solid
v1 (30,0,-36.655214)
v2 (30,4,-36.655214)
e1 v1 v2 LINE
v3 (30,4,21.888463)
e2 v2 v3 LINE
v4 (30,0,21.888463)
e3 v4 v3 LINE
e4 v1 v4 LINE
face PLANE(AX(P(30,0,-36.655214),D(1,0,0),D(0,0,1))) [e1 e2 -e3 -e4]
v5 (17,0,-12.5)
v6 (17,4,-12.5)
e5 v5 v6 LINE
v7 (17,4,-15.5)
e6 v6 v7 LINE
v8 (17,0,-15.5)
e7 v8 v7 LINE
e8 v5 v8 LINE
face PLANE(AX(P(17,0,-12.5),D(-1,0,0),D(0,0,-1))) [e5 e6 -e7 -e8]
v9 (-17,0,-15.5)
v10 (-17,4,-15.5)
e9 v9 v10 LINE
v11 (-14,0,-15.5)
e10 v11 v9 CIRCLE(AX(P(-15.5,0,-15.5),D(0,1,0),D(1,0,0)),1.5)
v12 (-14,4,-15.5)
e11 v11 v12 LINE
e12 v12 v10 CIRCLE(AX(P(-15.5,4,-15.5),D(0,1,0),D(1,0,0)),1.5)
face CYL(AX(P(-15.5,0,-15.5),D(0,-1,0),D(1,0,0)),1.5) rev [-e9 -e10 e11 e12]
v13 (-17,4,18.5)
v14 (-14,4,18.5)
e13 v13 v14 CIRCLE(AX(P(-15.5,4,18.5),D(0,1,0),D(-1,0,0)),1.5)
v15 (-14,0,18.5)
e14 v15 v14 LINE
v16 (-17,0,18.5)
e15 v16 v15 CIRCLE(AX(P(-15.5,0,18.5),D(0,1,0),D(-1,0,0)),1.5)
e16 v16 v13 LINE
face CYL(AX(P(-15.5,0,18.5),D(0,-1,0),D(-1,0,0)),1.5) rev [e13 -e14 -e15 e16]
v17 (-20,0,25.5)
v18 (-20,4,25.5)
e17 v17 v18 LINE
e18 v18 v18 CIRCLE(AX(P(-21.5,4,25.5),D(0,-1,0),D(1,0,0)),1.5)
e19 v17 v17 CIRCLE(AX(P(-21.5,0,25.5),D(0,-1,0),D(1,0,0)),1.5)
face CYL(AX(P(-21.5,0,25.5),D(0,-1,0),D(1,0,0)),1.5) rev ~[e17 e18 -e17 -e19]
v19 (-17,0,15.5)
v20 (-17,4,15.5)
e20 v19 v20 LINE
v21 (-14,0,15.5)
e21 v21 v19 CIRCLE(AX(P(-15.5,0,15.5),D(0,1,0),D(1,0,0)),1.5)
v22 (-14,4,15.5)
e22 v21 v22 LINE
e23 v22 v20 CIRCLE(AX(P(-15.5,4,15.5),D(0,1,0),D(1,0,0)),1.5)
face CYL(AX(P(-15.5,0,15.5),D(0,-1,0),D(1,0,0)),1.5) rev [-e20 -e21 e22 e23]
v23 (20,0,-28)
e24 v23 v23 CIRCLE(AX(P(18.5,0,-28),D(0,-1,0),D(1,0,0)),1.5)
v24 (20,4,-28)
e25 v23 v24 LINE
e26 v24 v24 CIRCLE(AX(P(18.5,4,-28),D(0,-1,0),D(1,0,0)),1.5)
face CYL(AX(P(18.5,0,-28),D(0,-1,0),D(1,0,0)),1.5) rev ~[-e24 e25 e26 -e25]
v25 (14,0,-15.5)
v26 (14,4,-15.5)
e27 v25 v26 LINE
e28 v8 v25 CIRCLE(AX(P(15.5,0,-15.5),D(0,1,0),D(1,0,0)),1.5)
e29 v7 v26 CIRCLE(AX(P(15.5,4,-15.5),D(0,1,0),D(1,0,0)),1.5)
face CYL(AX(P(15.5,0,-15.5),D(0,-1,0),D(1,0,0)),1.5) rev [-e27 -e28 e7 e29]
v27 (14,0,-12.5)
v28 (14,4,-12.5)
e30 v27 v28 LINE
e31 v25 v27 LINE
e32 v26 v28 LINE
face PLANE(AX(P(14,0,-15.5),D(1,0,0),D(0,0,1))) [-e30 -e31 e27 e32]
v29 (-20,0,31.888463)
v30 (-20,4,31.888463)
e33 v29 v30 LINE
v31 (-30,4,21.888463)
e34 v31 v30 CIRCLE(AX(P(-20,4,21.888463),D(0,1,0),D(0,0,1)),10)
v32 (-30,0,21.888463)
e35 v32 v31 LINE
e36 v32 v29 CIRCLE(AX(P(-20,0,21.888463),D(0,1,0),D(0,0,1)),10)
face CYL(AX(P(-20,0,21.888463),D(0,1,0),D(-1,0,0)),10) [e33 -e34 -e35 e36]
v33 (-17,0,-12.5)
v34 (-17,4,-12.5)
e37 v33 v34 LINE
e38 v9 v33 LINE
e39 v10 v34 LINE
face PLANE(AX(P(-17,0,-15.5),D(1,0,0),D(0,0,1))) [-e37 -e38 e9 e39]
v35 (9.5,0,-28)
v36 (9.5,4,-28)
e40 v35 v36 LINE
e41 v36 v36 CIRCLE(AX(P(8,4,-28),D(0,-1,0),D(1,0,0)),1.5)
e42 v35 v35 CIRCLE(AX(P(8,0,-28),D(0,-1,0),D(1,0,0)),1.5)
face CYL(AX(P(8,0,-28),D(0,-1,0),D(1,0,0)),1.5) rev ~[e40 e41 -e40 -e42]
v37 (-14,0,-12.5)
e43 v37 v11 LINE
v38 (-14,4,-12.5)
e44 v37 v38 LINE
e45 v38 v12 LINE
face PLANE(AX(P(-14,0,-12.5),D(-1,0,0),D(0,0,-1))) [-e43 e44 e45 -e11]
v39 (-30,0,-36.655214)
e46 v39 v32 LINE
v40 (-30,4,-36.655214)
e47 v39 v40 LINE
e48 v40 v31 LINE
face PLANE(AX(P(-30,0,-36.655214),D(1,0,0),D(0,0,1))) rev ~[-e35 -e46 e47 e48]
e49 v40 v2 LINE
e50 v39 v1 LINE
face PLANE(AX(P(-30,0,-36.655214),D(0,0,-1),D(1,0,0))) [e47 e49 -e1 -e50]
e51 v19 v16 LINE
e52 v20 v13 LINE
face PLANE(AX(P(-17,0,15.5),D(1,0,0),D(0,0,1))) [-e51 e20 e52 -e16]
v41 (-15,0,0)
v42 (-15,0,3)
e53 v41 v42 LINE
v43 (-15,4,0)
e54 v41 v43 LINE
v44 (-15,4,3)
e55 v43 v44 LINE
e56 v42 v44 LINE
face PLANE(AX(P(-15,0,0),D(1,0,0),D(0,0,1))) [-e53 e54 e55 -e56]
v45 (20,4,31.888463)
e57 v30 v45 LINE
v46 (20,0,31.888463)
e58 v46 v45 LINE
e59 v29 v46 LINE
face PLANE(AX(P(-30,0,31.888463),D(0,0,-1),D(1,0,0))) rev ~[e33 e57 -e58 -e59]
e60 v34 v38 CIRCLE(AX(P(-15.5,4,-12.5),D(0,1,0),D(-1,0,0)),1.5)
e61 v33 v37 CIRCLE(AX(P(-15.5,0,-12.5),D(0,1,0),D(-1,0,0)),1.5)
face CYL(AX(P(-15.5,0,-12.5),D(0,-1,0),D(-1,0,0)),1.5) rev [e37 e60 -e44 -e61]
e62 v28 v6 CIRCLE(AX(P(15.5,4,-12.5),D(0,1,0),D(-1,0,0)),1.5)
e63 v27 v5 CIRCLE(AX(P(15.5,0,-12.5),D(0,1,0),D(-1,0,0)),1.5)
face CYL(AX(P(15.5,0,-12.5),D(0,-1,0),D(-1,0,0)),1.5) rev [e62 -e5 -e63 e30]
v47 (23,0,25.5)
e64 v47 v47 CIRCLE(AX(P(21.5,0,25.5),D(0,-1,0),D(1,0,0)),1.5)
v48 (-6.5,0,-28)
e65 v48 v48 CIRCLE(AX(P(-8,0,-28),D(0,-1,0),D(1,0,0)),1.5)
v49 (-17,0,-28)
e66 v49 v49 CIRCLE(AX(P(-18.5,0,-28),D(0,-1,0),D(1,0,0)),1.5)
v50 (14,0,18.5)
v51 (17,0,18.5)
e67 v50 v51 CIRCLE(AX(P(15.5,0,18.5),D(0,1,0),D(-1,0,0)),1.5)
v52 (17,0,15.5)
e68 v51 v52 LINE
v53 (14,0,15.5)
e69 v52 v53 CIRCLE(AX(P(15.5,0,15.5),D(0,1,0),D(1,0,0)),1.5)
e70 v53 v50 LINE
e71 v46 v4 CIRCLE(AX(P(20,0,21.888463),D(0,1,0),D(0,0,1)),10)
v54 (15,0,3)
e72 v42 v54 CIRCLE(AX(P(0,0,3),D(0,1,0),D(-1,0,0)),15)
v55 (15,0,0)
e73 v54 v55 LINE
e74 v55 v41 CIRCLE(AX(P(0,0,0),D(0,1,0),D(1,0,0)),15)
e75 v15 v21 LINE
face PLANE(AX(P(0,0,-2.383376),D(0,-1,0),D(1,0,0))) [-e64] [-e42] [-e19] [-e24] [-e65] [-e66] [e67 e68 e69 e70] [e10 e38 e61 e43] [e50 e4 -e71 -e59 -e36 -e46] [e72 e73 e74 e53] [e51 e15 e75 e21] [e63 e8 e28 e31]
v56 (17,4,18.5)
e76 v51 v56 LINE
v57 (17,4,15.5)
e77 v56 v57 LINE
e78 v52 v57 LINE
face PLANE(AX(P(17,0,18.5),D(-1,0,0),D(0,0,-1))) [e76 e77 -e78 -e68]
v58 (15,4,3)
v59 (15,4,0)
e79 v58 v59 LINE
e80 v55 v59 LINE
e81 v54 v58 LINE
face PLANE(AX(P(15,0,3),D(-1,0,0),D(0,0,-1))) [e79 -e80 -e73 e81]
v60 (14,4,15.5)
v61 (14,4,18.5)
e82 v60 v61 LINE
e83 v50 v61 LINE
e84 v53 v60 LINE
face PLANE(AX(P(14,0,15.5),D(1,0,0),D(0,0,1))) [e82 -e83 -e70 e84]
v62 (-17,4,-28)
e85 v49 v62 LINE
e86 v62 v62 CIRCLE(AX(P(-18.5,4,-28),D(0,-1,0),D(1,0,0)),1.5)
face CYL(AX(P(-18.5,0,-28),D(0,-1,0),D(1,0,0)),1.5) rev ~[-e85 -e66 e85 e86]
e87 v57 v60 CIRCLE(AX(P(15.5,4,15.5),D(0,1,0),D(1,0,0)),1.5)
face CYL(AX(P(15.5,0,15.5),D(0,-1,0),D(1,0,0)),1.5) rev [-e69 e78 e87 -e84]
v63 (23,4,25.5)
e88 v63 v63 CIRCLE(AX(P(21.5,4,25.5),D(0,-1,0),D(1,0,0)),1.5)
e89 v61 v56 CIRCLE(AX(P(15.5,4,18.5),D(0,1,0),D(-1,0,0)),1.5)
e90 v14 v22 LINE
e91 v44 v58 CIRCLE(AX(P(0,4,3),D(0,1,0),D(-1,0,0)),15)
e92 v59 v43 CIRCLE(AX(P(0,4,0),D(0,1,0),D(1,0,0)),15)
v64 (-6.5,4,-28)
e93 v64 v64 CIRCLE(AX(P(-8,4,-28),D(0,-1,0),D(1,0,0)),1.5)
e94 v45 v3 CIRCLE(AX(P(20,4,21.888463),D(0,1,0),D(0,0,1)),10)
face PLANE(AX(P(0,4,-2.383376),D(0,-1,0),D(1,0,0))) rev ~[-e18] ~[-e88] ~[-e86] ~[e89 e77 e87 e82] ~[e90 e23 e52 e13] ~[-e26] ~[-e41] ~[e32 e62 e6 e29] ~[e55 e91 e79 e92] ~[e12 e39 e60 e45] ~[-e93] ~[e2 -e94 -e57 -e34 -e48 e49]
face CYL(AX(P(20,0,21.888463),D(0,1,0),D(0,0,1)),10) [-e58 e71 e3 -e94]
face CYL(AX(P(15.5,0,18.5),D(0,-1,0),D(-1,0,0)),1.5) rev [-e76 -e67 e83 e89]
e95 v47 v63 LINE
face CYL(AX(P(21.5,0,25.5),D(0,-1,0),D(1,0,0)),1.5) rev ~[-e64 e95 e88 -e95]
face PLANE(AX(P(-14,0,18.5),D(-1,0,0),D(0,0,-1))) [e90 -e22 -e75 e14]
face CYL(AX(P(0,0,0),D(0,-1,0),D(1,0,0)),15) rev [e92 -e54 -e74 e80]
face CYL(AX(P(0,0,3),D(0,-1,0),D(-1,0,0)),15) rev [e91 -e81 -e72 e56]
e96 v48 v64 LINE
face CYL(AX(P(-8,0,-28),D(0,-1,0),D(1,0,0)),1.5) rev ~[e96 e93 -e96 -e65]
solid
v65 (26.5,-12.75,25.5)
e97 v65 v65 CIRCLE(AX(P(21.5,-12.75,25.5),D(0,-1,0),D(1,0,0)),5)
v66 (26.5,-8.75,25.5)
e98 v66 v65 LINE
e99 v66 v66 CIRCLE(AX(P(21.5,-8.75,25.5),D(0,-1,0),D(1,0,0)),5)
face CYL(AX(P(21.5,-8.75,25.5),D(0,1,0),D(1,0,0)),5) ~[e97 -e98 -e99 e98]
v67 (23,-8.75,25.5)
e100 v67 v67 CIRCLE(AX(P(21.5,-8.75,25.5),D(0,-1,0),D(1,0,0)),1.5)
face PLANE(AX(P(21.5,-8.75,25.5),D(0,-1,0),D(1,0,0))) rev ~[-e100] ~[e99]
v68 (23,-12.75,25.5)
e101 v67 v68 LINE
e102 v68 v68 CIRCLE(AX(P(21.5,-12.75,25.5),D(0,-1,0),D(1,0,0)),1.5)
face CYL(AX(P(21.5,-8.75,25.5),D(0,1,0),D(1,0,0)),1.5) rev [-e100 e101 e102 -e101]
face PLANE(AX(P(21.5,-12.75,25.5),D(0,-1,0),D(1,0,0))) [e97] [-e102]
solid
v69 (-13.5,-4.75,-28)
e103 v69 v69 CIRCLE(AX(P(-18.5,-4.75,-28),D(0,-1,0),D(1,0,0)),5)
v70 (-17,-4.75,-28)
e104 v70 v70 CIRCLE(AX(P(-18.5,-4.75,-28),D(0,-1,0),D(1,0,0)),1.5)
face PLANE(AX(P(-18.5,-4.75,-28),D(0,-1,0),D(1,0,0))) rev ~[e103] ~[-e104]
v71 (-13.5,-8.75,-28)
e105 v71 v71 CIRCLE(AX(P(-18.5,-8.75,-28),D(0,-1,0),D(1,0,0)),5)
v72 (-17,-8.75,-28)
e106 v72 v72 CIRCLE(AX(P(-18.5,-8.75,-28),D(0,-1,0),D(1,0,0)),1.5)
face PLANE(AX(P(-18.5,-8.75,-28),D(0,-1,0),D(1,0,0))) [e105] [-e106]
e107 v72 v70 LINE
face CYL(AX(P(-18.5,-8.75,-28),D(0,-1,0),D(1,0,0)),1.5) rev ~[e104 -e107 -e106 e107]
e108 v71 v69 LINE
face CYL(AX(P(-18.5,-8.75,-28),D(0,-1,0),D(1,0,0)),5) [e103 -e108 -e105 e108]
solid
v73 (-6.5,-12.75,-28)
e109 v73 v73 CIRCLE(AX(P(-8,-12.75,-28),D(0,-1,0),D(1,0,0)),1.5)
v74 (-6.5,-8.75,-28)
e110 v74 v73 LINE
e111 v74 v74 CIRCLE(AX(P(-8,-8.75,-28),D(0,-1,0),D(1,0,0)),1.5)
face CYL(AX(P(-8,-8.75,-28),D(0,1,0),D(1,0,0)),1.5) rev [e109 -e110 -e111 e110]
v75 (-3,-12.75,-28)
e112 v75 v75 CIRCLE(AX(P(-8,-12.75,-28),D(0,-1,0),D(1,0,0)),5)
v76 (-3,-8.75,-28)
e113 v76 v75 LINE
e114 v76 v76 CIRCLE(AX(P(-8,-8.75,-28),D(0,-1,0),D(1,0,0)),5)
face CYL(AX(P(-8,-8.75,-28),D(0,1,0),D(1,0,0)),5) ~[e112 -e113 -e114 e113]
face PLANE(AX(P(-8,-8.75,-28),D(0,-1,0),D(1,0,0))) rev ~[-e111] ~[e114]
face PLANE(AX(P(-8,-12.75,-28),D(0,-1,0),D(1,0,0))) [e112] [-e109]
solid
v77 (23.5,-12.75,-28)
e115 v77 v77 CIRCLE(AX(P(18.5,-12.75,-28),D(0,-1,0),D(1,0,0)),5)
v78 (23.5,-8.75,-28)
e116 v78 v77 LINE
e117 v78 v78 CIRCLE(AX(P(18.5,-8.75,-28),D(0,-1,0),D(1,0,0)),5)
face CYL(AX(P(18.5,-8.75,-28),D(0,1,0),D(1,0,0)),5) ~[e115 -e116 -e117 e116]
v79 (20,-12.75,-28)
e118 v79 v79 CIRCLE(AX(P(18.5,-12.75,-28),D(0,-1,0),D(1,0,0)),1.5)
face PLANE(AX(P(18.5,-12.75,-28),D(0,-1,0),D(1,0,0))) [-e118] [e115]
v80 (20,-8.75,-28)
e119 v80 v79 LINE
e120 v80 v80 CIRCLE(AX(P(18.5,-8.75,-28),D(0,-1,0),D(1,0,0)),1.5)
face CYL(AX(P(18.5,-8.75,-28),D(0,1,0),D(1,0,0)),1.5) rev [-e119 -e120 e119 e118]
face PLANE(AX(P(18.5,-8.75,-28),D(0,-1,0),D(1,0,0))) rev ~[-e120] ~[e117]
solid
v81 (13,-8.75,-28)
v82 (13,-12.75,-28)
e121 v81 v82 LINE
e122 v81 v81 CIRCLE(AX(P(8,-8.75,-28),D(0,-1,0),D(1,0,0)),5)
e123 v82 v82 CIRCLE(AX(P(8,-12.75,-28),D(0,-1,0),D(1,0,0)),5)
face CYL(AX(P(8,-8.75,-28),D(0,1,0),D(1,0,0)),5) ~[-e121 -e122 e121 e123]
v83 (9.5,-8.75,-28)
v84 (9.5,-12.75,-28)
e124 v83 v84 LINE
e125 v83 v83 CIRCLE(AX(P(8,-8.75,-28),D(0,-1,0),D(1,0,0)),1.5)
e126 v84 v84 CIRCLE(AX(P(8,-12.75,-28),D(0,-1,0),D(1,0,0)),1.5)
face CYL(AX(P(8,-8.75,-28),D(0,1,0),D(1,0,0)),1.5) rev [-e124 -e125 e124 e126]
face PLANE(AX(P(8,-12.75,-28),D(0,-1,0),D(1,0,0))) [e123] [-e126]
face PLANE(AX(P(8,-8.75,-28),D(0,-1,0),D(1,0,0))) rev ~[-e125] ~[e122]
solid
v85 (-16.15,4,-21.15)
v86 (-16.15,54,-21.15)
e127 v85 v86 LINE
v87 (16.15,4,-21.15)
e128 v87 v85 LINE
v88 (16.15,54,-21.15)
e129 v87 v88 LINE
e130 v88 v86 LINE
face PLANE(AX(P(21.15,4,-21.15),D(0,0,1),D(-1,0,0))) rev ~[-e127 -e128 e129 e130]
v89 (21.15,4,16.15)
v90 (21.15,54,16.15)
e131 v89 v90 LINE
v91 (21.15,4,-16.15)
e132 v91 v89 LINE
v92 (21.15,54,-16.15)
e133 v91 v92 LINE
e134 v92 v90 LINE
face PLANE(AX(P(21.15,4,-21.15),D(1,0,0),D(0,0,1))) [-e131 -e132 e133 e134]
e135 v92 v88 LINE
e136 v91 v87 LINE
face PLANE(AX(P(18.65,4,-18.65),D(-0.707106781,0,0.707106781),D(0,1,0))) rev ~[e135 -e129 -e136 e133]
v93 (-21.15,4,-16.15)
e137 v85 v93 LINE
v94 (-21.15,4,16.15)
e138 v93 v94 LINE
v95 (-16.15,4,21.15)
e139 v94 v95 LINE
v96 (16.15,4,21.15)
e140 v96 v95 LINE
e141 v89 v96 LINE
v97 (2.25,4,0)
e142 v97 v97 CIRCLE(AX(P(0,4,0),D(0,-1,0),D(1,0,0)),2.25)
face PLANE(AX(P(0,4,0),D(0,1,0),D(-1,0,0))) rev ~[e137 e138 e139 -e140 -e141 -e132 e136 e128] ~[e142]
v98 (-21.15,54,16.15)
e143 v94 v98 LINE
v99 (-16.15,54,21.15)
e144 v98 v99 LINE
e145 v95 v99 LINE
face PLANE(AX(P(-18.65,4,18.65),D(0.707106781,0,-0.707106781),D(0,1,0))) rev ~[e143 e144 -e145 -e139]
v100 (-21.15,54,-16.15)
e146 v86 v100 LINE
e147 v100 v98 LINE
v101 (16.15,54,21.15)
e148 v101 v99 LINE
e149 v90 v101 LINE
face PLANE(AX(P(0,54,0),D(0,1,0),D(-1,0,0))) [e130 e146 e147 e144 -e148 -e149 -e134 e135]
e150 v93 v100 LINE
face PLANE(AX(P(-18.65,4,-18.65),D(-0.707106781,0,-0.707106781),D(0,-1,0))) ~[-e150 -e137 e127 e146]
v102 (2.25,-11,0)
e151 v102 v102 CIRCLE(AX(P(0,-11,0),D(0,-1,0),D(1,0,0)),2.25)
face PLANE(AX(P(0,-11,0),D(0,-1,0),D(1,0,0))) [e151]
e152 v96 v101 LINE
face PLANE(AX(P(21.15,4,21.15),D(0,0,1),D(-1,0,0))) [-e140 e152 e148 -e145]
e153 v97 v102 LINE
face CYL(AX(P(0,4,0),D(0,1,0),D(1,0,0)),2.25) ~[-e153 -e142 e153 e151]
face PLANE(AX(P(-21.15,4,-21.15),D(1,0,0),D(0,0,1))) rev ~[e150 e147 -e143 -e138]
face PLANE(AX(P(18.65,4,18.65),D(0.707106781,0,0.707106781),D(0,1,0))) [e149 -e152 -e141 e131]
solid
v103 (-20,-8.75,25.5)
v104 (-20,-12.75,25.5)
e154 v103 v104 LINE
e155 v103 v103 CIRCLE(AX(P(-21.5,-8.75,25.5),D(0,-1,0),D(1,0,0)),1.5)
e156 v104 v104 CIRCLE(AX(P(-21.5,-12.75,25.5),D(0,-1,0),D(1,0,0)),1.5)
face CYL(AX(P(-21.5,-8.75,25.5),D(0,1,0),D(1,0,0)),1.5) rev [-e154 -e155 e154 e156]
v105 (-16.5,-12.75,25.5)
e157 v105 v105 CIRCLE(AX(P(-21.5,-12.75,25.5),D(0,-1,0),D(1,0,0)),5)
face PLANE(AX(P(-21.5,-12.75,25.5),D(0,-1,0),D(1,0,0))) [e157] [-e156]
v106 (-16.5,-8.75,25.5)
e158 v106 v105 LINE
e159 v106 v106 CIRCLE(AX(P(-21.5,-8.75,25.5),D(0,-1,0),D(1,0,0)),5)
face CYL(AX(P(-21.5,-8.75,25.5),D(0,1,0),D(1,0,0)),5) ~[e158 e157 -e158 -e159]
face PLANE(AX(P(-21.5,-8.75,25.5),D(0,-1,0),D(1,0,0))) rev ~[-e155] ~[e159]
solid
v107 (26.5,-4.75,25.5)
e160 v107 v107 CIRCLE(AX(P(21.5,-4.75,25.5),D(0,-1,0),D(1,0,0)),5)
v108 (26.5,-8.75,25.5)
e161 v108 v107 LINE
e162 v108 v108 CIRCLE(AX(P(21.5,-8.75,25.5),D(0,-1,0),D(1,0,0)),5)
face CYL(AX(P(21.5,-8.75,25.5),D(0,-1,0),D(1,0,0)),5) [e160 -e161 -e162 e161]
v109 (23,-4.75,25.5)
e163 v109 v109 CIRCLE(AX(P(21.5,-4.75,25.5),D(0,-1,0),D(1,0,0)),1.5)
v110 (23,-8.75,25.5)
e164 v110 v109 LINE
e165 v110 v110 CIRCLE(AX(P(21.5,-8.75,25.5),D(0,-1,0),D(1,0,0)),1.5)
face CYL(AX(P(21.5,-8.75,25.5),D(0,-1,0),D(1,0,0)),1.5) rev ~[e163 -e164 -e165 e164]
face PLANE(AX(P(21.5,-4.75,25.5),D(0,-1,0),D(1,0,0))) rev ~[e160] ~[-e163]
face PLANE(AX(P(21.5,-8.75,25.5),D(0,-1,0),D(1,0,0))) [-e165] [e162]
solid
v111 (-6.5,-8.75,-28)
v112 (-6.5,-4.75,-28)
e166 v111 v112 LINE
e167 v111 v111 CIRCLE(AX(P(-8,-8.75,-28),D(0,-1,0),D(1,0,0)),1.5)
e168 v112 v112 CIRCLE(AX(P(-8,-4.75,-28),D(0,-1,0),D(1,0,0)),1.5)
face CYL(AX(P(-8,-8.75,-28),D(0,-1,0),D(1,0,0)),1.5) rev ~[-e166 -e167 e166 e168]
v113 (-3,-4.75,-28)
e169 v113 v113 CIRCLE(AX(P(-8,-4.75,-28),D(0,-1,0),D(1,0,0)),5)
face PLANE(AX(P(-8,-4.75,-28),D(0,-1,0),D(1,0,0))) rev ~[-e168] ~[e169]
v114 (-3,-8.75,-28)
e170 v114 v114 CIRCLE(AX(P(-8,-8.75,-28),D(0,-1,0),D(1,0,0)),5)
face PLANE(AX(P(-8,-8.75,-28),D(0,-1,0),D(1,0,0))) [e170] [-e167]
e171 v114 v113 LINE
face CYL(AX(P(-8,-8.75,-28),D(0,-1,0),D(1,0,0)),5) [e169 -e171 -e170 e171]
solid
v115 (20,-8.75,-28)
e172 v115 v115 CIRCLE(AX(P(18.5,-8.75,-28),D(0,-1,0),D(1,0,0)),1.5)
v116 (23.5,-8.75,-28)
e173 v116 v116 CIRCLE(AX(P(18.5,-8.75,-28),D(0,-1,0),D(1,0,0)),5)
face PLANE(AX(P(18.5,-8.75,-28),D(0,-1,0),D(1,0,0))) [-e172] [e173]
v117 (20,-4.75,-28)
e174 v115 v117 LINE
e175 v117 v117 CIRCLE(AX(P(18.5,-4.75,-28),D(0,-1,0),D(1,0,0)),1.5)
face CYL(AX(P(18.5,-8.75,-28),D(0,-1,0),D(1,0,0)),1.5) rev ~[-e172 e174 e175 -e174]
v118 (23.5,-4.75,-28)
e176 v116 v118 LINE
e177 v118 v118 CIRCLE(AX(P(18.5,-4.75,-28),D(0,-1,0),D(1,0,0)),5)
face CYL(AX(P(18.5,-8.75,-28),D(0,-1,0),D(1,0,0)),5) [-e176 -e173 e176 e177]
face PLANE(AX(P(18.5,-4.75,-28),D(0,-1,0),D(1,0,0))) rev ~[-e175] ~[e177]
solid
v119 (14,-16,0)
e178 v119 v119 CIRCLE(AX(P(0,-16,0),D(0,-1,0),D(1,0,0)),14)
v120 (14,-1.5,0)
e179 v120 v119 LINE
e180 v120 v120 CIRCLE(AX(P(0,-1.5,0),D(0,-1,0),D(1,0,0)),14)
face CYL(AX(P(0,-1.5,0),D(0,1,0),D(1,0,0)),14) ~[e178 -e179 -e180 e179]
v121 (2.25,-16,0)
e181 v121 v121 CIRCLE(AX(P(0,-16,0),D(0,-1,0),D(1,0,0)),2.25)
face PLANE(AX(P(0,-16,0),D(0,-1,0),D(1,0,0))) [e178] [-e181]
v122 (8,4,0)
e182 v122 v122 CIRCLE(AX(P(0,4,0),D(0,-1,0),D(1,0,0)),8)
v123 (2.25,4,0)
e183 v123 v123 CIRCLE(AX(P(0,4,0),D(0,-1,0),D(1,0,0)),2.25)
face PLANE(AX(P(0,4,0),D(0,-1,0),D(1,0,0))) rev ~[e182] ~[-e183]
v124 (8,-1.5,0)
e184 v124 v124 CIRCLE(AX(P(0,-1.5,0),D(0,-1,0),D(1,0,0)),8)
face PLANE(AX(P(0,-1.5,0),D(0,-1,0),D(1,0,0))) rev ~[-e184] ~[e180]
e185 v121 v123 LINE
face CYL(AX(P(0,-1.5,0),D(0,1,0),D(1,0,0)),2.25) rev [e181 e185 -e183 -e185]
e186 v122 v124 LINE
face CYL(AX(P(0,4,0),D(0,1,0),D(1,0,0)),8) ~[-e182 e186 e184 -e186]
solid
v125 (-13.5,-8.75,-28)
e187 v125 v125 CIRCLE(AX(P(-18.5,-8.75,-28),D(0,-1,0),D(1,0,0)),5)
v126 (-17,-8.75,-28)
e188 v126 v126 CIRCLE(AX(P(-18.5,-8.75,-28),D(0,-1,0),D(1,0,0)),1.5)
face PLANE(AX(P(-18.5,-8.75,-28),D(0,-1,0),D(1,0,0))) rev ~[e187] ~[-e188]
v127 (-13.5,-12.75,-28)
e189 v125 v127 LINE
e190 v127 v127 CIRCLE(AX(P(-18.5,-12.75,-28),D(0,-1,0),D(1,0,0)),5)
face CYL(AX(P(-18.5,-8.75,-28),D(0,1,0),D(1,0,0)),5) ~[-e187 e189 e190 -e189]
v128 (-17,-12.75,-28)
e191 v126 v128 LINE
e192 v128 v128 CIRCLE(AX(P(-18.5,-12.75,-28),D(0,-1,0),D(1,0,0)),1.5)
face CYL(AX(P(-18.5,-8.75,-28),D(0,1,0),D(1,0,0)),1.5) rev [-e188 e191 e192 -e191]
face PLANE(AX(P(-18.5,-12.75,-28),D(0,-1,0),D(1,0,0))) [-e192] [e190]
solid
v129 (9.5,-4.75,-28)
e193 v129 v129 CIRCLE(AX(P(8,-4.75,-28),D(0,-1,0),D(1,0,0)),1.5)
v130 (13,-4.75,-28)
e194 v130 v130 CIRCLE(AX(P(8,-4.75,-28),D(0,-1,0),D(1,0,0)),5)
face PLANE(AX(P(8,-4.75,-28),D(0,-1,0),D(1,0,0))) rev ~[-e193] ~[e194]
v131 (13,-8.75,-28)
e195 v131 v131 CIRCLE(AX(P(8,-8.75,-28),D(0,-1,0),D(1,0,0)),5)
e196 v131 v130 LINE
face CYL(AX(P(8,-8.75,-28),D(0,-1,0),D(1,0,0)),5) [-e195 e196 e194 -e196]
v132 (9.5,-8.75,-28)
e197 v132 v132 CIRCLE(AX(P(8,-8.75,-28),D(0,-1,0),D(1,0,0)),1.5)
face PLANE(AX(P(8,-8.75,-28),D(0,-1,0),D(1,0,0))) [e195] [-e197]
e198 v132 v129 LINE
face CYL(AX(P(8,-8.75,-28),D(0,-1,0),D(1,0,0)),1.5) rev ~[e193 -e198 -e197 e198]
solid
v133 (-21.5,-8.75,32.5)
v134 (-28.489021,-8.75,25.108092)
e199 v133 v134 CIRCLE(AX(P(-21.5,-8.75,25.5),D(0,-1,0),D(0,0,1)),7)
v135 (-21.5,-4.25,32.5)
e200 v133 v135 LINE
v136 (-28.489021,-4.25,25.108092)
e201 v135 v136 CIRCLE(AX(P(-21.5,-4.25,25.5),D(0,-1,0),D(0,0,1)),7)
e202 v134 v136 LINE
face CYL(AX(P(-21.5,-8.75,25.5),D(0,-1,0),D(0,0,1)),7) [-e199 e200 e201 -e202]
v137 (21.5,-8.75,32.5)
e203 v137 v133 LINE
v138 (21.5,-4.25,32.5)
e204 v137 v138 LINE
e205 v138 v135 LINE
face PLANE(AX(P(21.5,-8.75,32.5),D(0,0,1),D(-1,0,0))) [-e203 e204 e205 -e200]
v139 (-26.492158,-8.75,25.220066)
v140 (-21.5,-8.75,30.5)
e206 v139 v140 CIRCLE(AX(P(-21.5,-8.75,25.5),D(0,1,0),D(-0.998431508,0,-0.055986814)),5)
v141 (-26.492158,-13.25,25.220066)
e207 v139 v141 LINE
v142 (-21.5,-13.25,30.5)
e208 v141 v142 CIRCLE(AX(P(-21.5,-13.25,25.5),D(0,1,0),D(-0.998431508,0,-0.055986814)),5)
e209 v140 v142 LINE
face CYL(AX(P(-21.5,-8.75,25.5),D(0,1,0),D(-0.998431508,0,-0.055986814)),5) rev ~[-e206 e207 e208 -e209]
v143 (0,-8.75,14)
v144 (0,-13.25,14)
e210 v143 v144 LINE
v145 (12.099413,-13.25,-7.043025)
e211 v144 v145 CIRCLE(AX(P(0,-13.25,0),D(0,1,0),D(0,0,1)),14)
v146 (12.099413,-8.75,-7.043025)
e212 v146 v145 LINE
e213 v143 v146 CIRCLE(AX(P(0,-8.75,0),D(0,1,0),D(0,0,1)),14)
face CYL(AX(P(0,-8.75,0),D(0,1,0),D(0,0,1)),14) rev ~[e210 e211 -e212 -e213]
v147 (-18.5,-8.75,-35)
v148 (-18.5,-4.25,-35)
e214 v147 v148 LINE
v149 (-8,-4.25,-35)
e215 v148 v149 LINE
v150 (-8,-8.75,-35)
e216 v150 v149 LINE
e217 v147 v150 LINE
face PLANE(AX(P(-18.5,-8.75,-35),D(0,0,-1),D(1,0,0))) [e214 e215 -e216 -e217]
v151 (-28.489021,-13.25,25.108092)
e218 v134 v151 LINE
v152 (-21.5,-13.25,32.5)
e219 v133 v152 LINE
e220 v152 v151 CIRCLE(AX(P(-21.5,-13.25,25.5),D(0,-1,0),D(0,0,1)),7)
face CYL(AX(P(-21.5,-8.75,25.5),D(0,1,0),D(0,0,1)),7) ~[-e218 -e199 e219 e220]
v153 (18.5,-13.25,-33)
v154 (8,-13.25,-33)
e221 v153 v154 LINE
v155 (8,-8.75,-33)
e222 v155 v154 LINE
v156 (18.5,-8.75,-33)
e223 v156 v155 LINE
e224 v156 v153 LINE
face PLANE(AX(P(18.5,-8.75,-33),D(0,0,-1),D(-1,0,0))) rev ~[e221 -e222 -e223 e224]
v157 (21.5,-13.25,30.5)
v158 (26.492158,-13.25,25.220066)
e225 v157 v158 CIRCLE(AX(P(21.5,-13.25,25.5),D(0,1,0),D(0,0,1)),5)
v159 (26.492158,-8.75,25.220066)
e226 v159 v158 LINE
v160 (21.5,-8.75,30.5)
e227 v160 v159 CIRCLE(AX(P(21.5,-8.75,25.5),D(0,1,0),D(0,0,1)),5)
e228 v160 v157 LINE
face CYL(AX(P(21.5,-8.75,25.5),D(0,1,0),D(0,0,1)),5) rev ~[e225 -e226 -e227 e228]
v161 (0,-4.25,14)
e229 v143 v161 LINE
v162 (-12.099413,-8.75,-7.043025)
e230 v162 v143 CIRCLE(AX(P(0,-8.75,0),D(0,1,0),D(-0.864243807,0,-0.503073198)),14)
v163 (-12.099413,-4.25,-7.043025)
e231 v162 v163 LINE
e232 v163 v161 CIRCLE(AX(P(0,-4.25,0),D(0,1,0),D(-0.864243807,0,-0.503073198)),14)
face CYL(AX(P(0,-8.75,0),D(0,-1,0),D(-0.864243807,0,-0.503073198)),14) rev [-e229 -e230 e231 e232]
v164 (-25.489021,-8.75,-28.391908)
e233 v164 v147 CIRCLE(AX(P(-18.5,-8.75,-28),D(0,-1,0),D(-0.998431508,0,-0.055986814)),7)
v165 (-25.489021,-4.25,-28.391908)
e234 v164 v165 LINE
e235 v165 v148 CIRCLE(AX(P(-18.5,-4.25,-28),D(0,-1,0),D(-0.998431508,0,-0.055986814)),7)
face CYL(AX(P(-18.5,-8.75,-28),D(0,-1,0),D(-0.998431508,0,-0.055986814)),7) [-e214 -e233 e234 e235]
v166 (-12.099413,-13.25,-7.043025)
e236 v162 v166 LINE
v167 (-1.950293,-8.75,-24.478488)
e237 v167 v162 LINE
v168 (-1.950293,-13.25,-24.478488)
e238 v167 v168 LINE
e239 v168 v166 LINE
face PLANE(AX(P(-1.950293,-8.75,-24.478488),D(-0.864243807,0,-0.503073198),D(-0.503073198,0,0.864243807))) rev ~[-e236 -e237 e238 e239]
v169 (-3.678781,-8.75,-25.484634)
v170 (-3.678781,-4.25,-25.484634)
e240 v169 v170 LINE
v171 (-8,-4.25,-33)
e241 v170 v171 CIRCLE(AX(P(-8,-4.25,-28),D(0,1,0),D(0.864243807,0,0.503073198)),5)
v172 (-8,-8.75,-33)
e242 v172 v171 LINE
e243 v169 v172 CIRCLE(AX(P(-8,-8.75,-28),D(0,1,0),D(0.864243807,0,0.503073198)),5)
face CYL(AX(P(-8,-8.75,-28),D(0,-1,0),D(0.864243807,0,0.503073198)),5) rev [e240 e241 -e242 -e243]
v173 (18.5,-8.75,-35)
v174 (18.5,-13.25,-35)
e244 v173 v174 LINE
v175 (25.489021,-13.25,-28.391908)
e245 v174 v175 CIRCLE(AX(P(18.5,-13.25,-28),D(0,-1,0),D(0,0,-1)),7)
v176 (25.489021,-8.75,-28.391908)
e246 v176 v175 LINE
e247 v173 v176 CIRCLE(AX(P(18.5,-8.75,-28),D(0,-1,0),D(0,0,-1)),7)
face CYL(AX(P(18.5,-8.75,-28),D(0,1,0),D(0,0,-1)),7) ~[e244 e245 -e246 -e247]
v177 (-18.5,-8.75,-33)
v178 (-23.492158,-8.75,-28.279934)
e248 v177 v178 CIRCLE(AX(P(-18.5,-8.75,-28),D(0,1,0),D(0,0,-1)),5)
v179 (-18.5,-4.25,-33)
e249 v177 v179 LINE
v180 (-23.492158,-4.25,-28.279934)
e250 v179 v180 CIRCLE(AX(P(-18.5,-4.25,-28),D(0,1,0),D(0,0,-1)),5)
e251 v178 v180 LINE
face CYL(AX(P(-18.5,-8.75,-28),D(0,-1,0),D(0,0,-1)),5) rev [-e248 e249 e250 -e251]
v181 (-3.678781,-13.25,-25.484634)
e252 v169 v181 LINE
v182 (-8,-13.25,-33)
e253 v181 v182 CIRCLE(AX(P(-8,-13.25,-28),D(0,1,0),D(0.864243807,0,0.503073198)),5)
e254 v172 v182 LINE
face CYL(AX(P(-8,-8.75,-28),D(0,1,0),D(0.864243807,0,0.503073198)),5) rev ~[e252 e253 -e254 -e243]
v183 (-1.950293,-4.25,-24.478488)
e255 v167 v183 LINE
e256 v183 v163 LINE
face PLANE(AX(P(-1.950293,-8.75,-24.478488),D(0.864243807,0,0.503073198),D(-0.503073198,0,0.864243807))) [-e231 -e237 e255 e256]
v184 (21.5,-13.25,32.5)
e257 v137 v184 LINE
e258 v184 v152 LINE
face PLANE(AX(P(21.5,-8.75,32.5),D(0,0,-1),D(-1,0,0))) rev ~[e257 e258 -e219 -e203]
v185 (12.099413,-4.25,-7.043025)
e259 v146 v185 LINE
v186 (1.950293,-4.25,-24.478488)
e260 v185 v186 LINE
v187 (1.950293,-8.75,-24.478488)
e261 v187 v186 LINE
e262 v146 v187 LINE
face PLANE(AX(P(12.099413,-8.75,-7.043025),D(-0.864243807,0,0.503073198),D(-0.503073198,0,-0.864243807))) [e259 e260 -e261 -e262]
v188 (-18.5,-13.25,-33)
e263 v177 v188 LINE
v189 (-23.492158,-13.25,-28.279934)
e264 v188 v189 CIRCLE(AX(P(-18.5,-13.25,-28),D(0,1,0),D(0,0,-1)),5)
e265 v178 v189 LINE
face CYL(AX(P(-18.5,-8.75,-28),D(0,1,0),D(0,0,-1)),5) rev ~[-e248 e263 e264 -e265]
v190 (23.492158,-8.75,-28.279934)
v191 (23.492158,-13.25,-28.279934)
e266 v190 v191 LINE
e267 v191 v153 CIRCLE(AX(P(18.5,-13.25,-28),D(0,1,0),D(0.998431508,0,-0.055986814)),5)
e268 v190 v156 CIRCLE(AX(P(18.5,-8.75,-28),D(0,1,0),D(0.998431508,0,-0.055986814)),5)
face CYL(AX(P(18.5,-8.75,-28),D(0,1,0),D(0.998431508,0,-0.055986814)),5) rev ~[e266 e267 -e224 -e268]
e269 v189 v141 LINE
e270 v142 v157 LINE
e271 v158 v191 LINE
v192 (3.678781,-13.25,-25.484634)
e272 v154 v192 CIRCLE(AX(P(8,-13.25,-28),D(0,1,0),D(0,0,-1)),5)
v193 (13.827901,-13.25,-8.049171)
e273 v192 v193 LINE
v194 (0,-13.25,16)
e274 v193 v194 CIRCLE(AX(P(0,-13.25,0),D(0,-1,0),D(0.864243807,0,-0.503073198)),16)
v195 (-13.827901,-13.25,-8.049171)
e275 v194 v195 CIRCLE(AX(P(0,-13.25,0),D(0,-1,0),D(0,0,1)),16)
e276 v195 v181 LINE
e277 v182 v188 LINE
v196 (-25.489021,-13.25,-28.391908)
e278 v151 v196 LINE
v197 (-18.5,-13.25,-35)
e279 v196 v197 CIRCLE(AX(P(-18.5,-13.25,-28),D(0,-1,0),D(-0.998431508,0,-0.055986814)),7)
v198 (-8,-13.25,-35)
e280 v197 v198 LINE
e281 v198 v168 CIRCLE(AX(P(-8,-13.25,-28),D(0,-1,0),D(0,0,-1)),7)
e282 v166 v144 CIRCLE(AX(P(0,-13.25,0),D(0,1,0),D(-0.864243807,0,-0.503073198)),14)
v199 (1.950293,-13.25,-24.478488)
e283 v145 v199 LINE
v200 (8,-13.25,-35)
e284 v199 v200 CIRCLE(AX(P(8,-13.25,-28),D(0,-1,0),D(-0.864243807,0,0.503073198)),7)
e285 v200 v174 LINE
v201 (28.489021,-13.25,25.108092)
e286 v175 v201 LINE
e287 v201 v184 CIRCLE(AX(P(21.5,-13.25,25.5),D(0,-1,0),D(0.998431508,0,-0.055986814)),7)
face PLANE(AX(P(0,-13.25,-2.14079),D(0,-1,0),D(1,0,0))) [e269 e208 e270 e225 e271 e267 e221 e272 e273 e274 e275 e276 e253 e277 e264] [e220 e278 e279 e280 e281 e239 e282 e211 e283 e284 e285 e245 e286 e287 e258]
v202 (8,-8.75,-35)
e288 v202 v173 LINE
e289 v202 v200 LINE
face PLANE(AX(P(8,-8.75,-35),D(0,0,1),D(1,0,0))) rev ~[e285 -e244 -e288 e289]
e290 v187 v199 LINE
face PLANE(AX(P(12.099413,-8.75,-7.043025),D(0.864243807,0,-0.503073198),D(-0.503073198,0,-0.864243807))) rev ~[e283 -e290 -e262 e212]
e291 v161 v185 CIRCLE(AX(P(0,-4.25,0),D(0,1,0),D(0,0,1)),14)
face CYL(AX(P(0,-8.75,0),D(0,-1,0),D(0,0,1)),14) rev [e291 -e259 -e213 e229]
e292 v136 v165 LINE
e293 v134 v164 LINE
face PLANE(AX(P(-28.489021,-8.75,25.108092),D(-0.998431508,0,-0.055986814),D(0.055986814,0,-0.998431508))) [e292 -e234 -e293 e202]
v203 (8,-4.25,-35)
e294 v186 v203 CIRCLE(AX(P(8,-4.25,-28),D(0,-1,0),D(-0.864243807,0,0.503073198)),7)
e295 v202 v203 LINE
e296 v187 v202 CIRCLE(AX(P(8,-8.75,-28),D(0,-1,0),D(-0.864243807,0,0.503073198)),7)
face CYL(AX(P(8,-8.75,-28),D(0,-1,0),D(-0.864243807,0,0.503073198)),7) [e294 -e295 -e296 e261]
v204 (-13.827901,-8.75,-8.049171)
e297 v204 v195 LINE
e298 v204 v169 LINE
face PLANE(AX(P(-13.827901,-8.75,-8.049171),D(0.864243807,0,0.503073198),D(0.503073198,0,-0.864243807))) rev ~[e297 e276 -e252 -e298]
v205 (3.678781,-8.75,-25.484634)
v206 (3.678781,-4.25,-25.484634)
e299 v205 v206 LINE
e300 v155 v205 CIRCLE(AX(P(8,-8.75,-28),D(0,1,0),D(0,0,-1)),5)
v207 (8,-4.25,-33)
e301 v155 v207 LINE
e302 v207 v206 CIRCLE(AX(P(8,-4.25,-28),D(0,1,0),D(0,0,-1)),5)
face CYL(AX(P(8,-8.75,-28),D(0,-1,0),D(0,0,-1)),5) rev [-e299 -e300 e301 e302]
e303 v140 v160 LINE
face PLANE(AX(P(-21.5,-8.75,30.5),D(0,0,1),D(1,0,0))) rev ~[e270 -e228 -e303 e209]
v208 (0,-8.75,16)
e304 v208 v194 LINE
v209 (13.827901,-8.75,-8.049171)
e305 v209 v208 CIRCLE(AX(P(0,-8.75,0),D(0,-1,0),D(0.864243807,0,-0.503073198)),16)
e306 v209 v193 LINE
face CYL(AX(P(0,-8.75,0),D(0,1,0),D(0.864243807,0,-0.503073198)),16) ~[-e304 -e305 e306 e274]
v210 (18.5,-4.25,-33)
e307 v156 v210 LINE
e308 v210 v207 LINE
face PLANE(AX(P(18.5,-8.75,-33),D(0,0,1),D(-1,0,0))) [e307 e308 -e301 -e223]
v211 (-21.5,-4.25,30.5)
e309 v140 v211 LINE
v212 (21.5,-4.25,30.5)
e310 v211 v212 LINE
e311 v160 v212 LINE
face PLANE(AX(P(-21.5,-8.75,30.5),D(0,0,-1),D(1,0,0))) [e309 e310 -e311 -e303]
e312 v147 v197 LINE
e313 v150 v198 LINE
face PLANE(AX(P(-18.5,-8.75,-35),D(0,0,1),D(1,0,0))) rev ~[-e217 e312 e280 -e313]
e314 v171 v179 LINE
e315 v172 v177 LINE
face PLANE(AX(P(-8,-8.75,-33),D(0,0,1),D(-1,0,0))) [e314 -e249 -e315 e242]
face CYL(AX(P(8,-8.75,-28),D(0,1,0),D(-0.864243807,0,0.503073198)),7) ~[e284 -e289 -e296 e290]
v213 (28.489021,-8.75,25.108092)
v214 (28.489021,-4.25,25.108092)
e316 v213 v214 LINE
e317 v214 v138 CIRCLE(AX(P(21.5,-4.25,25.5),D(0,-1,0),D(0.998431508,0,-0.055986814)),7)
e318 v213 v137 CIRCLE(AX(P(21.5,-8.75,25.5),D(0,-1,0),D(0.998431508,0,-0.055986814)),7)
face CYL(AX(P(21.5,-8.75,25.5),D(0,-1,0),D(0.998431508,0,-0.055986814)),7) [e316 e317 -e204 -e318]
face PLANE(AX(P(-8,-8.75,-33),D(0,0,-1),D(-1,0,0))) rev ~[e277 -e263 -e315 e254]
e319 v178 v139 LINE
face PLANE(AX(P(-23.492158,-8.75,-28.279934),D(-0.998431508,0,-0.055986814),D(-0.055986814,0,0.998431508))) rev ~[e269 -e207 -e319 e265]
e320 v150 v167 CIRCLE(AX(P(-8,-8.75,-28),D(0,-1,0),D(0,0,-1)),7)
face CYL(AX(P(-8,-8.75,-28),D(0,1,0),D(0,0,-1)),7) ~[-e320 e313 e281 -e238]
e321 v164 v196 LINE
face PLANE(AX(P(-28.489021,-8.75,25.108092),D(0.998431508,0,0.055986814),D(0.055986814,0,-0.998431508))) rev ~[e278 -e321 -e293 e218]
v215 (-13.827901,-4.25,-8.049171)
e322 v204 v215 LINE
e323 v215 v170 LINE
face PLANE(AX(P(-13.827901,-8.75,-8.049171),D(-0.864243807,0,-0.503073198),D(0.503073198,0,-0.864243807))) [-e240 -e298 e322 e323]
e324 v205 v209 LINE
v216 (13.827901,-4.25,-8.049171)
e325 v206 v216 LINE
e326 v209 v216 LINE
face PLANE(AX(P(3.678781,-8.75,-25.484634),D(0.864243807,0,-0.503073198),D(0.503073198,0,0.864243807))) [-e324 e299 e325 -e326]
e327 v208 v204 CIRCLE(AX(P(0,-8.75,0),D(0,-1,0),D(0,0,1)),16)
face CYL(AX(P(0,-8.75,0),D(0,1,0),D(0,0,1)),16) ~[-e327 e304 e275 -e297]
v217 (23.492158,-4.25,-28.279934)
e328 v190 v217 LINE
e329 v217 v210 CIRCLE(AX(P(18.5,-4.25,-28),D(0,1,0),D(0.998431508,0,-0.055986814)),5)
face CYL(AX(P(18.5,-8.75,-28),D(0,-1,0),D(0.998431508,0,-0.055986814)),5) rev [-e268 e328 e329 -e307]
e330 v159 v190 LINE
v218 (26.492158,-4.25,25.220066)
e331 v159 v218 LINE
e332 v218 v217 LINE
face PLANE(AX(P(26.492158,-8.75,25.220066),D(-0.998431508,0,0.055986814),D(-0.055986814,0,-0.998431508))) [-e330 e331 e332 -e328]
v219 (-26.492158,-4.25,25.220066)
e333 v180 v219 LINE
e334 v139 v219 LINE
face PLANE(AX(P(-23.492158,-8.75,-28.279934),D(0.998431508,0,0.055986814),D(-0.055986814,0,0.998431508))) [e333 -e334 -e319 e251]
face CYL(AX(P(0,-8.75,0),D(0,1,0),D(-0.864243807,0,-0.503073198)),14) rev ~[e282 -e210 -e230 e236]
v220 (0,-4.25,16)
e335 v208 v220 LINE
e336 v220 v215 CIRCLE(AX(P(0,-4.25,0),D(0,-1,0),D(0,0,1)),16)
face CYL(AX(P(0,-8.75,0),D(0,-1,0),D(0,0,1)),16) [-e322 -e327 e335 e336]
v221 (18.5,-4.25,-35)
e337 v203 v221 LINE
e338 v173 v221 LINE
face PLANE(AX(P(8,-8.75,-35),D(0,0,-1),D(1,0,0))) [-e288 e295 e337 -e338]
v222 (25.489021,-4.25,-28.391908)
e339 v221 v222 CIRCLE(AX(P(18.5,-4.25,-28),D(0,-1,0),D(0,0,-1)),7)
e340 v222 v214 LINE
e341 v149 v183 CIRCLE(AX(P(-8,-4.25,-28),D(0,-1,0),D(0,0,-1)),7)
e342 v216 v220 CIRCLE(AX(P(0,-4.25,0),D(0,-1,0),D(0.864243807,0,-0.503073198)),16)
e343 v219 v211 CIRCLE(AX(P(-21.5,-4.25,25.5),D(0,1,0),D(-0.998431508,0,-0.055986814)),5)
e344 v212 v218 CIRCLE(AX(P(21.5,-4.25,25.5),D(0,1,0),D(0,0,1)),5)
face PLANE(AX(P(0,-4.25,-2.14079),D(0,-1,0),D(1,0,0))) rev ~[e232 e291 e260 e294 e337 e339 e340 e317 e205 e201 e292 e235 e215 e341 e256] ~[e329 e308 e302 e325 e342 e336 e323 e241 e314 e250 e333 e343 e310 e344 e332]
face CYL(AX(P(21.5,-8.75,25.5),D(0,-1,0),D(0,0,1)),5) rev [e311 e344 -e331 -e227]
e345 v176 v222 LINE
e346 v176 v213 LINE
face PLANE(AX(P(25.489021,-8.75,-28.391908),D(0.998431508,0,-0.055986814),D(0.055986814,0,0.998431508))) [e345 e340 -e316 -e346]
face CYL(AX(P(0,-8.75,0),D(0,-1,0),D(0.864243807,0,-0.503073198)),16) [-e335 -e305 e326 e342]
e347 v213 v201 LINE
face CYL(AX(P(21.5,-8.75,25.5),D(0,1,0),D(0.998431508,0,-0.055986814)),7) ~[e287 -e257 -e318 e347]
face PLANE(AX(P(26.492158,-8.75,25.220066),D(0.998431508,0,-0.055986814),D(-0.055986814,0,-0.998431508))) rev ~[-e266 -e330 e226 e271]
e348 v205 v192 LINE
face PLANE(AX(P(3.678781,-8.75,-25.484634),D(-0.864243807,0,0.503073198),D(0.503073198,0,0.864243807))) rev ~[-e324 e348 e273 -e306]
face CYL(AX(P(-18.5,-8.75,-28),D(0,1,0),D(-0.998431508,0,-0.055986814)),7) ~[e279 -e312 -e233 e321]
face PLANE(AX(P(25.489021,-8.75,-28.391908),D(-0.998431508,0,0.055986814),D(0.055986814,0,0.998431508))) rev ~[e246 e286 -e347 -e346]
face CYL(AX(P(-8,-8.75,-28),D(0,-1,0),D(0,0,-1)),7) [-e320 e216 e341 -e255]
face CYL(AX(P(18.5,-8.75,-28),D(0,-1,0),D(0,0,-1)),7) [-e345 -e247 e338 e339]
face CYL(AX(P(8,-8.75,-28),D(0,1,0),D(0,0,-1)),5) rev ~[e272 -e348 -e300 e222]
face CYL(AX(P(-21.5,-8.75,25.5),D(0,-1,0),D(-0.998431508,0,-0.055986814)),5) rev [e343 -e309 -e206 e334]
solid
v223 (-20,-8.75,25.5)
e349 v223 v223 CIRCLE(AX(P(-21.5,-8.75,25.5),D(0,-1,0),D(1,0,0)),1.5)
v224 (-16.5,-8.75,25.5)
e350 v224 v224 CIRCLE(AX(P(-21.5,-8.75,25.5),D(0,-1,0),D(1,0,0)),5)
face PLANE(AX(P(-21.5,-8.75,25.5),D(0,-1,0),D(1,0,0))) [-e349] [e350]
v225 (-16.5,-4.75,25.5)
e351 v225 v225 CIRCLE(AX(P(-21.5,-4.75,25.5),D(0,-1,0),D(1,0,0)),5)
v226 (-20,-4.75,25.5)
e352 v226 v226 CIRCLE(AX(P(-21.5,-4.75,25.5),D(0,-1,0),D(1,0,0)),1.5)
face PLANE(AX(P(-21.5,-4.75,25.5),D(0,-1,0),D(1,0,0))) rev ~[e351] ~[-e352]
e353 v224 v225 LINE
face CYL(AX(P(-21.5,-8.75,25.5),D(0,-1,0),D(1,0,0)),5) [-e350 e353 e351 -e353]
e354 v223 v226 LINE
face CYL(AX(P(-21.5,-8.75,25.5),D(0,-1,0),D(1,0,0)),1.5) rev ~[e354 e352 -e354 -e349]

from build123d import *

# Parameters (mm, degrees)
F0_W      = 60
F0_H      = 68.5436762869
F0_R      = 1.5
F1_DEPTH  = 4
F2_W      = 42.3
F2_H      = 42.3
F3_DEPTH  = 50
F4_SIZE   = 5
F5_R      = 2.25
F6_DEPTH  = 15
F8_R      = 8
F8_R_2    = 2.25
F9_DEPTH  = 5.5
F10_R     = 14
F10_R_2   = 2.25
F11_DEPTH = 14.5
F13_R     = 5
F13_R_2   = 1.5
F14_DEPTH = 4
F15_DEPTH = 4
F17_DEPTH = 4.5
F18_R     = 10


with BuildPart() as f1:
    # F0 (on Front) → F1 (new body)
    with BuildSketch(Plane.XZ):
        with Locations((0, -2.3833755404)):
            Rectangle(F0_W, F0_H)
        with Locations((-18.5, -28)):
            Circle(F0_R, mode=Mode.SUBTRACT)
        with Locations((-8, -28)):
            Circle(F0_R, mode=Mode.SUBTRACT)
        with BuildLine():
            ThreePointArc((-17, -12.5), (-15.5, -11), (-14, -12.5))
            Line((-14, -12.5), (-14, -15.5))
            ThreePointArc((-14, -15.5), (-15.5, -17), (-17, -15.5))
            Line((-17, -15.5), (-17, -12.5))
        make_face(mode=Mode.SUBTRACT)
        with Locations((8, -28)):
            Circle(F0_R, mode=Mode.SUBTRACT)
        with Locations((18.5, -28)):
            Circle(F0_R, mode=Mode.SUBTRACT)
        with BuildLine():
            Line((14, -15.5), (14, -12.5))
            ThreePointArc((14, -12.5), (15.5, -11), (17, -12.5))
            Line((17, -12.5), (17, -15.5))
            ThreePointArc((17, -15.5), (15.5, -17), (14, -15.5))
        make_face(mode=Mode.SUBTRACT)
        with BuildLine():
            ThreePointArc((-17, 18.5), (-15.5, 20), (-14, 18.5))
            Line((-14, 18.5), (-14, 15.5))
            ThreePointArc((-14, 15.5), (-15.5, 14), (-17, 15.5))
            Line((-17, 15.5), (-17, 18.5))
        make_face(mode=Mode.SUBTRACT)
        with Locations((-21.5, 25.5)):
            Circle(F0_R, mode=Mode.SUBTRACT)
        with BuildLine():
            ThreePointArc((15, 0), (0, -15), (-15, 0))
            Line((-15, 0), (-15, 3))
            ThreePointArc((-15, 3), (0, 18), (15, 3))
            Line((15, 3), (15, 0))
        make_face(mode=Mode.SUBTRACT)
        with BuildLine():
            Line((17, 18.5), (17, 15.5))
            ThreePointArc((17, 15.5), (15.5, 14), (14, 15.5))
            Line((14, 15.5), (14, 18.5))
            ThreePointArc((14, 18.5), (15.5, 20), (17, 18.5))
        make_face(mode=Mode.SUBTRACT)
        with Locations((21.5, 25.5)):
            Circle(F0_R, mode=Mode.SUBTRACT)
    extrude(amount=-F1_DEPTH)

    # F18
    f18_edges = [f1.edges().sort_by_distance(p)[0] for p in [
        (-30, 2, 31.888463),
        (30, 2, 31.888463),
    ]]
    fillet(f18_edges, radius=F18_R)


with BuildPart() as f3:
    # F2 (on face) → F3 (new body)
    with BuildSketch(Plane(origin=(0, 4, 0), x_dir=(-1, 0, 0), z_dir=(0, 1, 0))):
        Rectangle(F2_W, F2_H)
    extrude(amount=F3_DEPTH)

    # F4
    f4_edges = [f3.edges().sort_by_distance(p)[0] for p in [
        (-21.15, 29, 21.15),
        (21.15, 29, 21.15),
        (-21.15, 29, -21.15),
        (21.15, 29, -21.15),
    ]]
    chamfer(f4_edges, length=F4_SIZE)

    # F5 (on face) → F6 (join)
    with BuildSketch(Plane.XZ.offset(-4)):
        Circle(F5_R)
    extrude(amount=F6_DEPTH)


with BuildPart() as f9:
    # F8 (on offset) → F9 (new body)
    with BuildSketch(Plane.XZ.offset(-4)):
        Circle(F8_R)
        Circle(F8_R_2, mode=Mode.SUBTRACT)
    extrude(amount=F9_DEPTH)

    # F10 (on face) → F11 (join)
    with BuildSketch(Plane.XZ.offset(1.5)):
        Circle(F10_R)
        Circle(F10_R_2, mode=Mode.SUBTRACT)
    extrude(amount=F11_DEPTH)


with BuildPart() as f14:
    # F13 (on mid) → F14 (new body)
    with BuildSketch(Plane.XZ.offset(8.75)):
        with Locations((-18.5, -28)):
            Circle(F13_R)
        with Locations((-18.5, -28)):
            Circle(F13_R_2, mode=Mode.SUBTRACT)
    extrude(amount=F14_DEPTH)


with BuildPart() as f14b:
    # F13 (on mid) → F14, piece 2 (new body)
    with BuildSketch(Plane.XZ.offset(8.75)):
        with Locations((-8, -28)):
            Circle(F13_R)
        with Locations((-8, -28)):
            Circle(F13_R_2, mode=Mode.SUBTRACT)
    extrude(amount=F14_DEPTH)


with BuildPart() as f14c:
    # F13 (on mid) → F14, piece 3 (new body)
    with BuildSketch(Plane.XZ.offset(8.75)):
        with Locations((8, -28)):
            Circle(F13_R)
        with Locations((8, -28)):
            Circle(F13_R_2, mode=Mode.SUBTRACT)
    extrude(amount=F14_DEPTH)


with BuildPart() as f14d:
    # F13 (on mid) → F14, piece 4 (new body)
    with BuildSketch(Plane.XZ.offset(8.75)):
        with Locations((18.5, -28)):
            Circle(F13_R)
        with Locations((18.5, -28)):
            Circle(F13_R_2, mode=Mode.SUBTRACT)
    extrude(amount=F14_DEPTH)


with BuildPart() as f14e:
    # F13 (on mid) → F14, piece 5 (new body)
    with BuildSketch(Plane.XZ.offset(8.75)):
        with Locations((-21.5, 25.5)):
            Circle(F13_R)
        with Locations((-21.5, 25.5)):
            Circle(F13_R_2, mode=Mode.SUBTRACT)
    extrude(amount=F14_DEPTH)


with BuildPart() as f14f:
    # F13 (on mid) → F14, piece 6 (new body)
    with BuildSketch(Plane.XZ.offset(8.75)):
        with Locations((21.5, 25.5)):
            Circle(F13_R)
        with Locations((21.5, 25.5)):
            Circle(F13_R_2, mode=Mode.SUBTRACT)
    extrude(amount=F14_DEPTH)


with BuildPart() as f15:
    # F15 (new): a face of the model
    f15_faces = [f14d.part.faces().sort_by_distance(p)[0] for p in [
        (13.6414213562, -8.75, -28),
    ]]
    extrude(f15_faces, amount=F15_DEPTH)


with BuildPart() as f15b:
    # F15#2 (new): a face of the model
    f15_2_faces = [f14c.part.faces().sort_by_distance(p)[0] for p in [
        (3.1414213562, -8.75, -28),
    ]]
    extrude(f15_2_faces, amount=F15_DEPTH)


with BuildPart() as f15c:
    # F15#3 (new): a face of the model
    f15_3_faces = [f14b.part.faces().sort_by_distance(p)[0] for p in [
        (-12.8585786438, -8.75, -28),
    ]]
    extrude(f15_3_faces, amount=F15_DEPTH)


with BuildPart() as f15d:
    # F15#4 (new): a face of the model
    f15_4_faces = [f14.part.faces().sort_by_distance(p)[0] for p in [
        (-23.3585786438, -8.75, -28),
    ]]
    extrude(f15_4_faces, amount=F15_DEPTH)


with BuildPart() as f15e:
    # F15#5 (new): a face of the model
    f15_5_faces = [f14e.part.faces().sort_by_distance(p)[0] for p in [
        (-26.3585786438, -8.75, 25.5),
    ]]
    extrude(f15_5_faces, amount=F15_DEPTH)


with BuildPart() as f15f:
    # F15#6 (new): a face of the model
    f15_6_faces = [f14f.part.faces().sort_by_distance(p)[0] for p in [
        (16.6414213562, -8.75, 25.5),
    ]]
    extrude(f15_6_faces, amount=F15_DEPTH)


with BuildPart() as f17:
    # F16 (on mid) → F17 (new body, symmetric)
    with BuildSketch(Plane.XZ.offset(8.75)):
        with BuildLine():
            ThreePointArc((0, 14), (12.1367694801, 6.9784544554), (12.0994132933, -7.0430247733))
            Line((12.0994132933, -7.0430247733), (1.9502933534, -24.4784876133))
            ThreePointArc((1.9502933534, -24.4784876133), (1.9316152599, -31.4892272277), (8, -35))
            Line((8, -35), (18.5, -35))
            ThreePointArc((18.5, -35), (23.3091915192, -33.0864208371), (25.4890205579, -28.3919076948))
            Line((25.4890205579, -28.3919076948), (28.4890205579, 25.1080923052))
            ThreePointArc((28.4890205579, 25.1080923052), (26.5864208371, 30.3091915192), (21.5, 32.5))
            Line((21.5, 32.5), (0, 32.5))
            Line((0, 32.5), (-21.5, 32.5))
            ThreePointArc((-21.5, 32.5), (-26.5864208371, 30.3091915192), (-28.4890205579, 25.1080923052))
            Line((-28.4890205579, 25.1080923052), (-25.4890205579, -28.3919076948))
            ThreePointArc((-25.4890205579, -28.3919076948), (-23.3091915192, -33.0864208371), (-18.5, -35))
            Line((-18.5, -35), (-8, -35))
            ThreePointArc((-8, -35), (-1.9316152599, -31.4892272277), (-1.9502933534, -24.4784876133))
            Line((-1.9502933534, -24.4784876133), (-12.0994132933, -7.0430247733))
            ThreePointArc((-12.0994132933, -7.0430247733), (-12.1367694801, 6.9784544554), (0, 14))
        make_face()
        with BuildLine():
            Line((18.5, -33), (8, -33))
            ThreePointArc((8, -33), (3.6654394714, -30.4923051627), (3.6787809667, -25.4846340095))
            Line((3.6787809667, -25.4846340095), (13.8279009066, -8.0491711695))
            ThreePointArc((13.8279009066, -8.0491711695), (13.8705936916, 7.9753765205), (0, 16))
            ThreePointArc((0, 16), (-13.8705936916, 7.9753765205), (-13.8279009066, -8.0491711695))
            Line((-13.8279009066, -8.0491711695), (-3.6787809667, -25.4846340095))
            ThreePointArc((-3.6787809667, -25.4846340095), (-3.6654394714, -30.4923051627), (-8, -33))
            Line((-8, -33), (-18.5, -33))
            ThreePointArc((-18.5, -33), (-21.9351367994, -31.6331577408), (-23.4921575414, -28.2799340677))
            Line((-23.4921575414, -28.2799340677), (-26.4921575414, 25.2200659323))
            ThreePointArc((-26.4921575414, 25.2200659323), (-25.1331577408, 28.9351367994), (-21.5, 30.5))
            Line((-21.5, 30.5), (0, 30.5))
            Line((0, 30.5), (21.5, 30.5))
            ThreePointArc((21.5, 30.5), (25.1331577408, 28.9351367994), (26.4921575414, 25.2200659323))
            Line((26.4921575414, 25.2200659323), (23.4921575414, -28.2799340677))
            ThreePointArc((23.4921575414, -28.2799340677), (21.9351367994, -31.6331577408), (18.5, -33))
        make_face(mode=Mode.SUBTRACT)
    extrude(amount=F17_DEPTH, both=True)


solid = Compound([f1.part, f3.part, f9.part, f14.part, f14b.part, f14c.part, f14d.part, f14e.part, f14f.part, f15.part, f15b.part, f15c.part, f15d.part, f15e.part, f15f.part, f17.part])
